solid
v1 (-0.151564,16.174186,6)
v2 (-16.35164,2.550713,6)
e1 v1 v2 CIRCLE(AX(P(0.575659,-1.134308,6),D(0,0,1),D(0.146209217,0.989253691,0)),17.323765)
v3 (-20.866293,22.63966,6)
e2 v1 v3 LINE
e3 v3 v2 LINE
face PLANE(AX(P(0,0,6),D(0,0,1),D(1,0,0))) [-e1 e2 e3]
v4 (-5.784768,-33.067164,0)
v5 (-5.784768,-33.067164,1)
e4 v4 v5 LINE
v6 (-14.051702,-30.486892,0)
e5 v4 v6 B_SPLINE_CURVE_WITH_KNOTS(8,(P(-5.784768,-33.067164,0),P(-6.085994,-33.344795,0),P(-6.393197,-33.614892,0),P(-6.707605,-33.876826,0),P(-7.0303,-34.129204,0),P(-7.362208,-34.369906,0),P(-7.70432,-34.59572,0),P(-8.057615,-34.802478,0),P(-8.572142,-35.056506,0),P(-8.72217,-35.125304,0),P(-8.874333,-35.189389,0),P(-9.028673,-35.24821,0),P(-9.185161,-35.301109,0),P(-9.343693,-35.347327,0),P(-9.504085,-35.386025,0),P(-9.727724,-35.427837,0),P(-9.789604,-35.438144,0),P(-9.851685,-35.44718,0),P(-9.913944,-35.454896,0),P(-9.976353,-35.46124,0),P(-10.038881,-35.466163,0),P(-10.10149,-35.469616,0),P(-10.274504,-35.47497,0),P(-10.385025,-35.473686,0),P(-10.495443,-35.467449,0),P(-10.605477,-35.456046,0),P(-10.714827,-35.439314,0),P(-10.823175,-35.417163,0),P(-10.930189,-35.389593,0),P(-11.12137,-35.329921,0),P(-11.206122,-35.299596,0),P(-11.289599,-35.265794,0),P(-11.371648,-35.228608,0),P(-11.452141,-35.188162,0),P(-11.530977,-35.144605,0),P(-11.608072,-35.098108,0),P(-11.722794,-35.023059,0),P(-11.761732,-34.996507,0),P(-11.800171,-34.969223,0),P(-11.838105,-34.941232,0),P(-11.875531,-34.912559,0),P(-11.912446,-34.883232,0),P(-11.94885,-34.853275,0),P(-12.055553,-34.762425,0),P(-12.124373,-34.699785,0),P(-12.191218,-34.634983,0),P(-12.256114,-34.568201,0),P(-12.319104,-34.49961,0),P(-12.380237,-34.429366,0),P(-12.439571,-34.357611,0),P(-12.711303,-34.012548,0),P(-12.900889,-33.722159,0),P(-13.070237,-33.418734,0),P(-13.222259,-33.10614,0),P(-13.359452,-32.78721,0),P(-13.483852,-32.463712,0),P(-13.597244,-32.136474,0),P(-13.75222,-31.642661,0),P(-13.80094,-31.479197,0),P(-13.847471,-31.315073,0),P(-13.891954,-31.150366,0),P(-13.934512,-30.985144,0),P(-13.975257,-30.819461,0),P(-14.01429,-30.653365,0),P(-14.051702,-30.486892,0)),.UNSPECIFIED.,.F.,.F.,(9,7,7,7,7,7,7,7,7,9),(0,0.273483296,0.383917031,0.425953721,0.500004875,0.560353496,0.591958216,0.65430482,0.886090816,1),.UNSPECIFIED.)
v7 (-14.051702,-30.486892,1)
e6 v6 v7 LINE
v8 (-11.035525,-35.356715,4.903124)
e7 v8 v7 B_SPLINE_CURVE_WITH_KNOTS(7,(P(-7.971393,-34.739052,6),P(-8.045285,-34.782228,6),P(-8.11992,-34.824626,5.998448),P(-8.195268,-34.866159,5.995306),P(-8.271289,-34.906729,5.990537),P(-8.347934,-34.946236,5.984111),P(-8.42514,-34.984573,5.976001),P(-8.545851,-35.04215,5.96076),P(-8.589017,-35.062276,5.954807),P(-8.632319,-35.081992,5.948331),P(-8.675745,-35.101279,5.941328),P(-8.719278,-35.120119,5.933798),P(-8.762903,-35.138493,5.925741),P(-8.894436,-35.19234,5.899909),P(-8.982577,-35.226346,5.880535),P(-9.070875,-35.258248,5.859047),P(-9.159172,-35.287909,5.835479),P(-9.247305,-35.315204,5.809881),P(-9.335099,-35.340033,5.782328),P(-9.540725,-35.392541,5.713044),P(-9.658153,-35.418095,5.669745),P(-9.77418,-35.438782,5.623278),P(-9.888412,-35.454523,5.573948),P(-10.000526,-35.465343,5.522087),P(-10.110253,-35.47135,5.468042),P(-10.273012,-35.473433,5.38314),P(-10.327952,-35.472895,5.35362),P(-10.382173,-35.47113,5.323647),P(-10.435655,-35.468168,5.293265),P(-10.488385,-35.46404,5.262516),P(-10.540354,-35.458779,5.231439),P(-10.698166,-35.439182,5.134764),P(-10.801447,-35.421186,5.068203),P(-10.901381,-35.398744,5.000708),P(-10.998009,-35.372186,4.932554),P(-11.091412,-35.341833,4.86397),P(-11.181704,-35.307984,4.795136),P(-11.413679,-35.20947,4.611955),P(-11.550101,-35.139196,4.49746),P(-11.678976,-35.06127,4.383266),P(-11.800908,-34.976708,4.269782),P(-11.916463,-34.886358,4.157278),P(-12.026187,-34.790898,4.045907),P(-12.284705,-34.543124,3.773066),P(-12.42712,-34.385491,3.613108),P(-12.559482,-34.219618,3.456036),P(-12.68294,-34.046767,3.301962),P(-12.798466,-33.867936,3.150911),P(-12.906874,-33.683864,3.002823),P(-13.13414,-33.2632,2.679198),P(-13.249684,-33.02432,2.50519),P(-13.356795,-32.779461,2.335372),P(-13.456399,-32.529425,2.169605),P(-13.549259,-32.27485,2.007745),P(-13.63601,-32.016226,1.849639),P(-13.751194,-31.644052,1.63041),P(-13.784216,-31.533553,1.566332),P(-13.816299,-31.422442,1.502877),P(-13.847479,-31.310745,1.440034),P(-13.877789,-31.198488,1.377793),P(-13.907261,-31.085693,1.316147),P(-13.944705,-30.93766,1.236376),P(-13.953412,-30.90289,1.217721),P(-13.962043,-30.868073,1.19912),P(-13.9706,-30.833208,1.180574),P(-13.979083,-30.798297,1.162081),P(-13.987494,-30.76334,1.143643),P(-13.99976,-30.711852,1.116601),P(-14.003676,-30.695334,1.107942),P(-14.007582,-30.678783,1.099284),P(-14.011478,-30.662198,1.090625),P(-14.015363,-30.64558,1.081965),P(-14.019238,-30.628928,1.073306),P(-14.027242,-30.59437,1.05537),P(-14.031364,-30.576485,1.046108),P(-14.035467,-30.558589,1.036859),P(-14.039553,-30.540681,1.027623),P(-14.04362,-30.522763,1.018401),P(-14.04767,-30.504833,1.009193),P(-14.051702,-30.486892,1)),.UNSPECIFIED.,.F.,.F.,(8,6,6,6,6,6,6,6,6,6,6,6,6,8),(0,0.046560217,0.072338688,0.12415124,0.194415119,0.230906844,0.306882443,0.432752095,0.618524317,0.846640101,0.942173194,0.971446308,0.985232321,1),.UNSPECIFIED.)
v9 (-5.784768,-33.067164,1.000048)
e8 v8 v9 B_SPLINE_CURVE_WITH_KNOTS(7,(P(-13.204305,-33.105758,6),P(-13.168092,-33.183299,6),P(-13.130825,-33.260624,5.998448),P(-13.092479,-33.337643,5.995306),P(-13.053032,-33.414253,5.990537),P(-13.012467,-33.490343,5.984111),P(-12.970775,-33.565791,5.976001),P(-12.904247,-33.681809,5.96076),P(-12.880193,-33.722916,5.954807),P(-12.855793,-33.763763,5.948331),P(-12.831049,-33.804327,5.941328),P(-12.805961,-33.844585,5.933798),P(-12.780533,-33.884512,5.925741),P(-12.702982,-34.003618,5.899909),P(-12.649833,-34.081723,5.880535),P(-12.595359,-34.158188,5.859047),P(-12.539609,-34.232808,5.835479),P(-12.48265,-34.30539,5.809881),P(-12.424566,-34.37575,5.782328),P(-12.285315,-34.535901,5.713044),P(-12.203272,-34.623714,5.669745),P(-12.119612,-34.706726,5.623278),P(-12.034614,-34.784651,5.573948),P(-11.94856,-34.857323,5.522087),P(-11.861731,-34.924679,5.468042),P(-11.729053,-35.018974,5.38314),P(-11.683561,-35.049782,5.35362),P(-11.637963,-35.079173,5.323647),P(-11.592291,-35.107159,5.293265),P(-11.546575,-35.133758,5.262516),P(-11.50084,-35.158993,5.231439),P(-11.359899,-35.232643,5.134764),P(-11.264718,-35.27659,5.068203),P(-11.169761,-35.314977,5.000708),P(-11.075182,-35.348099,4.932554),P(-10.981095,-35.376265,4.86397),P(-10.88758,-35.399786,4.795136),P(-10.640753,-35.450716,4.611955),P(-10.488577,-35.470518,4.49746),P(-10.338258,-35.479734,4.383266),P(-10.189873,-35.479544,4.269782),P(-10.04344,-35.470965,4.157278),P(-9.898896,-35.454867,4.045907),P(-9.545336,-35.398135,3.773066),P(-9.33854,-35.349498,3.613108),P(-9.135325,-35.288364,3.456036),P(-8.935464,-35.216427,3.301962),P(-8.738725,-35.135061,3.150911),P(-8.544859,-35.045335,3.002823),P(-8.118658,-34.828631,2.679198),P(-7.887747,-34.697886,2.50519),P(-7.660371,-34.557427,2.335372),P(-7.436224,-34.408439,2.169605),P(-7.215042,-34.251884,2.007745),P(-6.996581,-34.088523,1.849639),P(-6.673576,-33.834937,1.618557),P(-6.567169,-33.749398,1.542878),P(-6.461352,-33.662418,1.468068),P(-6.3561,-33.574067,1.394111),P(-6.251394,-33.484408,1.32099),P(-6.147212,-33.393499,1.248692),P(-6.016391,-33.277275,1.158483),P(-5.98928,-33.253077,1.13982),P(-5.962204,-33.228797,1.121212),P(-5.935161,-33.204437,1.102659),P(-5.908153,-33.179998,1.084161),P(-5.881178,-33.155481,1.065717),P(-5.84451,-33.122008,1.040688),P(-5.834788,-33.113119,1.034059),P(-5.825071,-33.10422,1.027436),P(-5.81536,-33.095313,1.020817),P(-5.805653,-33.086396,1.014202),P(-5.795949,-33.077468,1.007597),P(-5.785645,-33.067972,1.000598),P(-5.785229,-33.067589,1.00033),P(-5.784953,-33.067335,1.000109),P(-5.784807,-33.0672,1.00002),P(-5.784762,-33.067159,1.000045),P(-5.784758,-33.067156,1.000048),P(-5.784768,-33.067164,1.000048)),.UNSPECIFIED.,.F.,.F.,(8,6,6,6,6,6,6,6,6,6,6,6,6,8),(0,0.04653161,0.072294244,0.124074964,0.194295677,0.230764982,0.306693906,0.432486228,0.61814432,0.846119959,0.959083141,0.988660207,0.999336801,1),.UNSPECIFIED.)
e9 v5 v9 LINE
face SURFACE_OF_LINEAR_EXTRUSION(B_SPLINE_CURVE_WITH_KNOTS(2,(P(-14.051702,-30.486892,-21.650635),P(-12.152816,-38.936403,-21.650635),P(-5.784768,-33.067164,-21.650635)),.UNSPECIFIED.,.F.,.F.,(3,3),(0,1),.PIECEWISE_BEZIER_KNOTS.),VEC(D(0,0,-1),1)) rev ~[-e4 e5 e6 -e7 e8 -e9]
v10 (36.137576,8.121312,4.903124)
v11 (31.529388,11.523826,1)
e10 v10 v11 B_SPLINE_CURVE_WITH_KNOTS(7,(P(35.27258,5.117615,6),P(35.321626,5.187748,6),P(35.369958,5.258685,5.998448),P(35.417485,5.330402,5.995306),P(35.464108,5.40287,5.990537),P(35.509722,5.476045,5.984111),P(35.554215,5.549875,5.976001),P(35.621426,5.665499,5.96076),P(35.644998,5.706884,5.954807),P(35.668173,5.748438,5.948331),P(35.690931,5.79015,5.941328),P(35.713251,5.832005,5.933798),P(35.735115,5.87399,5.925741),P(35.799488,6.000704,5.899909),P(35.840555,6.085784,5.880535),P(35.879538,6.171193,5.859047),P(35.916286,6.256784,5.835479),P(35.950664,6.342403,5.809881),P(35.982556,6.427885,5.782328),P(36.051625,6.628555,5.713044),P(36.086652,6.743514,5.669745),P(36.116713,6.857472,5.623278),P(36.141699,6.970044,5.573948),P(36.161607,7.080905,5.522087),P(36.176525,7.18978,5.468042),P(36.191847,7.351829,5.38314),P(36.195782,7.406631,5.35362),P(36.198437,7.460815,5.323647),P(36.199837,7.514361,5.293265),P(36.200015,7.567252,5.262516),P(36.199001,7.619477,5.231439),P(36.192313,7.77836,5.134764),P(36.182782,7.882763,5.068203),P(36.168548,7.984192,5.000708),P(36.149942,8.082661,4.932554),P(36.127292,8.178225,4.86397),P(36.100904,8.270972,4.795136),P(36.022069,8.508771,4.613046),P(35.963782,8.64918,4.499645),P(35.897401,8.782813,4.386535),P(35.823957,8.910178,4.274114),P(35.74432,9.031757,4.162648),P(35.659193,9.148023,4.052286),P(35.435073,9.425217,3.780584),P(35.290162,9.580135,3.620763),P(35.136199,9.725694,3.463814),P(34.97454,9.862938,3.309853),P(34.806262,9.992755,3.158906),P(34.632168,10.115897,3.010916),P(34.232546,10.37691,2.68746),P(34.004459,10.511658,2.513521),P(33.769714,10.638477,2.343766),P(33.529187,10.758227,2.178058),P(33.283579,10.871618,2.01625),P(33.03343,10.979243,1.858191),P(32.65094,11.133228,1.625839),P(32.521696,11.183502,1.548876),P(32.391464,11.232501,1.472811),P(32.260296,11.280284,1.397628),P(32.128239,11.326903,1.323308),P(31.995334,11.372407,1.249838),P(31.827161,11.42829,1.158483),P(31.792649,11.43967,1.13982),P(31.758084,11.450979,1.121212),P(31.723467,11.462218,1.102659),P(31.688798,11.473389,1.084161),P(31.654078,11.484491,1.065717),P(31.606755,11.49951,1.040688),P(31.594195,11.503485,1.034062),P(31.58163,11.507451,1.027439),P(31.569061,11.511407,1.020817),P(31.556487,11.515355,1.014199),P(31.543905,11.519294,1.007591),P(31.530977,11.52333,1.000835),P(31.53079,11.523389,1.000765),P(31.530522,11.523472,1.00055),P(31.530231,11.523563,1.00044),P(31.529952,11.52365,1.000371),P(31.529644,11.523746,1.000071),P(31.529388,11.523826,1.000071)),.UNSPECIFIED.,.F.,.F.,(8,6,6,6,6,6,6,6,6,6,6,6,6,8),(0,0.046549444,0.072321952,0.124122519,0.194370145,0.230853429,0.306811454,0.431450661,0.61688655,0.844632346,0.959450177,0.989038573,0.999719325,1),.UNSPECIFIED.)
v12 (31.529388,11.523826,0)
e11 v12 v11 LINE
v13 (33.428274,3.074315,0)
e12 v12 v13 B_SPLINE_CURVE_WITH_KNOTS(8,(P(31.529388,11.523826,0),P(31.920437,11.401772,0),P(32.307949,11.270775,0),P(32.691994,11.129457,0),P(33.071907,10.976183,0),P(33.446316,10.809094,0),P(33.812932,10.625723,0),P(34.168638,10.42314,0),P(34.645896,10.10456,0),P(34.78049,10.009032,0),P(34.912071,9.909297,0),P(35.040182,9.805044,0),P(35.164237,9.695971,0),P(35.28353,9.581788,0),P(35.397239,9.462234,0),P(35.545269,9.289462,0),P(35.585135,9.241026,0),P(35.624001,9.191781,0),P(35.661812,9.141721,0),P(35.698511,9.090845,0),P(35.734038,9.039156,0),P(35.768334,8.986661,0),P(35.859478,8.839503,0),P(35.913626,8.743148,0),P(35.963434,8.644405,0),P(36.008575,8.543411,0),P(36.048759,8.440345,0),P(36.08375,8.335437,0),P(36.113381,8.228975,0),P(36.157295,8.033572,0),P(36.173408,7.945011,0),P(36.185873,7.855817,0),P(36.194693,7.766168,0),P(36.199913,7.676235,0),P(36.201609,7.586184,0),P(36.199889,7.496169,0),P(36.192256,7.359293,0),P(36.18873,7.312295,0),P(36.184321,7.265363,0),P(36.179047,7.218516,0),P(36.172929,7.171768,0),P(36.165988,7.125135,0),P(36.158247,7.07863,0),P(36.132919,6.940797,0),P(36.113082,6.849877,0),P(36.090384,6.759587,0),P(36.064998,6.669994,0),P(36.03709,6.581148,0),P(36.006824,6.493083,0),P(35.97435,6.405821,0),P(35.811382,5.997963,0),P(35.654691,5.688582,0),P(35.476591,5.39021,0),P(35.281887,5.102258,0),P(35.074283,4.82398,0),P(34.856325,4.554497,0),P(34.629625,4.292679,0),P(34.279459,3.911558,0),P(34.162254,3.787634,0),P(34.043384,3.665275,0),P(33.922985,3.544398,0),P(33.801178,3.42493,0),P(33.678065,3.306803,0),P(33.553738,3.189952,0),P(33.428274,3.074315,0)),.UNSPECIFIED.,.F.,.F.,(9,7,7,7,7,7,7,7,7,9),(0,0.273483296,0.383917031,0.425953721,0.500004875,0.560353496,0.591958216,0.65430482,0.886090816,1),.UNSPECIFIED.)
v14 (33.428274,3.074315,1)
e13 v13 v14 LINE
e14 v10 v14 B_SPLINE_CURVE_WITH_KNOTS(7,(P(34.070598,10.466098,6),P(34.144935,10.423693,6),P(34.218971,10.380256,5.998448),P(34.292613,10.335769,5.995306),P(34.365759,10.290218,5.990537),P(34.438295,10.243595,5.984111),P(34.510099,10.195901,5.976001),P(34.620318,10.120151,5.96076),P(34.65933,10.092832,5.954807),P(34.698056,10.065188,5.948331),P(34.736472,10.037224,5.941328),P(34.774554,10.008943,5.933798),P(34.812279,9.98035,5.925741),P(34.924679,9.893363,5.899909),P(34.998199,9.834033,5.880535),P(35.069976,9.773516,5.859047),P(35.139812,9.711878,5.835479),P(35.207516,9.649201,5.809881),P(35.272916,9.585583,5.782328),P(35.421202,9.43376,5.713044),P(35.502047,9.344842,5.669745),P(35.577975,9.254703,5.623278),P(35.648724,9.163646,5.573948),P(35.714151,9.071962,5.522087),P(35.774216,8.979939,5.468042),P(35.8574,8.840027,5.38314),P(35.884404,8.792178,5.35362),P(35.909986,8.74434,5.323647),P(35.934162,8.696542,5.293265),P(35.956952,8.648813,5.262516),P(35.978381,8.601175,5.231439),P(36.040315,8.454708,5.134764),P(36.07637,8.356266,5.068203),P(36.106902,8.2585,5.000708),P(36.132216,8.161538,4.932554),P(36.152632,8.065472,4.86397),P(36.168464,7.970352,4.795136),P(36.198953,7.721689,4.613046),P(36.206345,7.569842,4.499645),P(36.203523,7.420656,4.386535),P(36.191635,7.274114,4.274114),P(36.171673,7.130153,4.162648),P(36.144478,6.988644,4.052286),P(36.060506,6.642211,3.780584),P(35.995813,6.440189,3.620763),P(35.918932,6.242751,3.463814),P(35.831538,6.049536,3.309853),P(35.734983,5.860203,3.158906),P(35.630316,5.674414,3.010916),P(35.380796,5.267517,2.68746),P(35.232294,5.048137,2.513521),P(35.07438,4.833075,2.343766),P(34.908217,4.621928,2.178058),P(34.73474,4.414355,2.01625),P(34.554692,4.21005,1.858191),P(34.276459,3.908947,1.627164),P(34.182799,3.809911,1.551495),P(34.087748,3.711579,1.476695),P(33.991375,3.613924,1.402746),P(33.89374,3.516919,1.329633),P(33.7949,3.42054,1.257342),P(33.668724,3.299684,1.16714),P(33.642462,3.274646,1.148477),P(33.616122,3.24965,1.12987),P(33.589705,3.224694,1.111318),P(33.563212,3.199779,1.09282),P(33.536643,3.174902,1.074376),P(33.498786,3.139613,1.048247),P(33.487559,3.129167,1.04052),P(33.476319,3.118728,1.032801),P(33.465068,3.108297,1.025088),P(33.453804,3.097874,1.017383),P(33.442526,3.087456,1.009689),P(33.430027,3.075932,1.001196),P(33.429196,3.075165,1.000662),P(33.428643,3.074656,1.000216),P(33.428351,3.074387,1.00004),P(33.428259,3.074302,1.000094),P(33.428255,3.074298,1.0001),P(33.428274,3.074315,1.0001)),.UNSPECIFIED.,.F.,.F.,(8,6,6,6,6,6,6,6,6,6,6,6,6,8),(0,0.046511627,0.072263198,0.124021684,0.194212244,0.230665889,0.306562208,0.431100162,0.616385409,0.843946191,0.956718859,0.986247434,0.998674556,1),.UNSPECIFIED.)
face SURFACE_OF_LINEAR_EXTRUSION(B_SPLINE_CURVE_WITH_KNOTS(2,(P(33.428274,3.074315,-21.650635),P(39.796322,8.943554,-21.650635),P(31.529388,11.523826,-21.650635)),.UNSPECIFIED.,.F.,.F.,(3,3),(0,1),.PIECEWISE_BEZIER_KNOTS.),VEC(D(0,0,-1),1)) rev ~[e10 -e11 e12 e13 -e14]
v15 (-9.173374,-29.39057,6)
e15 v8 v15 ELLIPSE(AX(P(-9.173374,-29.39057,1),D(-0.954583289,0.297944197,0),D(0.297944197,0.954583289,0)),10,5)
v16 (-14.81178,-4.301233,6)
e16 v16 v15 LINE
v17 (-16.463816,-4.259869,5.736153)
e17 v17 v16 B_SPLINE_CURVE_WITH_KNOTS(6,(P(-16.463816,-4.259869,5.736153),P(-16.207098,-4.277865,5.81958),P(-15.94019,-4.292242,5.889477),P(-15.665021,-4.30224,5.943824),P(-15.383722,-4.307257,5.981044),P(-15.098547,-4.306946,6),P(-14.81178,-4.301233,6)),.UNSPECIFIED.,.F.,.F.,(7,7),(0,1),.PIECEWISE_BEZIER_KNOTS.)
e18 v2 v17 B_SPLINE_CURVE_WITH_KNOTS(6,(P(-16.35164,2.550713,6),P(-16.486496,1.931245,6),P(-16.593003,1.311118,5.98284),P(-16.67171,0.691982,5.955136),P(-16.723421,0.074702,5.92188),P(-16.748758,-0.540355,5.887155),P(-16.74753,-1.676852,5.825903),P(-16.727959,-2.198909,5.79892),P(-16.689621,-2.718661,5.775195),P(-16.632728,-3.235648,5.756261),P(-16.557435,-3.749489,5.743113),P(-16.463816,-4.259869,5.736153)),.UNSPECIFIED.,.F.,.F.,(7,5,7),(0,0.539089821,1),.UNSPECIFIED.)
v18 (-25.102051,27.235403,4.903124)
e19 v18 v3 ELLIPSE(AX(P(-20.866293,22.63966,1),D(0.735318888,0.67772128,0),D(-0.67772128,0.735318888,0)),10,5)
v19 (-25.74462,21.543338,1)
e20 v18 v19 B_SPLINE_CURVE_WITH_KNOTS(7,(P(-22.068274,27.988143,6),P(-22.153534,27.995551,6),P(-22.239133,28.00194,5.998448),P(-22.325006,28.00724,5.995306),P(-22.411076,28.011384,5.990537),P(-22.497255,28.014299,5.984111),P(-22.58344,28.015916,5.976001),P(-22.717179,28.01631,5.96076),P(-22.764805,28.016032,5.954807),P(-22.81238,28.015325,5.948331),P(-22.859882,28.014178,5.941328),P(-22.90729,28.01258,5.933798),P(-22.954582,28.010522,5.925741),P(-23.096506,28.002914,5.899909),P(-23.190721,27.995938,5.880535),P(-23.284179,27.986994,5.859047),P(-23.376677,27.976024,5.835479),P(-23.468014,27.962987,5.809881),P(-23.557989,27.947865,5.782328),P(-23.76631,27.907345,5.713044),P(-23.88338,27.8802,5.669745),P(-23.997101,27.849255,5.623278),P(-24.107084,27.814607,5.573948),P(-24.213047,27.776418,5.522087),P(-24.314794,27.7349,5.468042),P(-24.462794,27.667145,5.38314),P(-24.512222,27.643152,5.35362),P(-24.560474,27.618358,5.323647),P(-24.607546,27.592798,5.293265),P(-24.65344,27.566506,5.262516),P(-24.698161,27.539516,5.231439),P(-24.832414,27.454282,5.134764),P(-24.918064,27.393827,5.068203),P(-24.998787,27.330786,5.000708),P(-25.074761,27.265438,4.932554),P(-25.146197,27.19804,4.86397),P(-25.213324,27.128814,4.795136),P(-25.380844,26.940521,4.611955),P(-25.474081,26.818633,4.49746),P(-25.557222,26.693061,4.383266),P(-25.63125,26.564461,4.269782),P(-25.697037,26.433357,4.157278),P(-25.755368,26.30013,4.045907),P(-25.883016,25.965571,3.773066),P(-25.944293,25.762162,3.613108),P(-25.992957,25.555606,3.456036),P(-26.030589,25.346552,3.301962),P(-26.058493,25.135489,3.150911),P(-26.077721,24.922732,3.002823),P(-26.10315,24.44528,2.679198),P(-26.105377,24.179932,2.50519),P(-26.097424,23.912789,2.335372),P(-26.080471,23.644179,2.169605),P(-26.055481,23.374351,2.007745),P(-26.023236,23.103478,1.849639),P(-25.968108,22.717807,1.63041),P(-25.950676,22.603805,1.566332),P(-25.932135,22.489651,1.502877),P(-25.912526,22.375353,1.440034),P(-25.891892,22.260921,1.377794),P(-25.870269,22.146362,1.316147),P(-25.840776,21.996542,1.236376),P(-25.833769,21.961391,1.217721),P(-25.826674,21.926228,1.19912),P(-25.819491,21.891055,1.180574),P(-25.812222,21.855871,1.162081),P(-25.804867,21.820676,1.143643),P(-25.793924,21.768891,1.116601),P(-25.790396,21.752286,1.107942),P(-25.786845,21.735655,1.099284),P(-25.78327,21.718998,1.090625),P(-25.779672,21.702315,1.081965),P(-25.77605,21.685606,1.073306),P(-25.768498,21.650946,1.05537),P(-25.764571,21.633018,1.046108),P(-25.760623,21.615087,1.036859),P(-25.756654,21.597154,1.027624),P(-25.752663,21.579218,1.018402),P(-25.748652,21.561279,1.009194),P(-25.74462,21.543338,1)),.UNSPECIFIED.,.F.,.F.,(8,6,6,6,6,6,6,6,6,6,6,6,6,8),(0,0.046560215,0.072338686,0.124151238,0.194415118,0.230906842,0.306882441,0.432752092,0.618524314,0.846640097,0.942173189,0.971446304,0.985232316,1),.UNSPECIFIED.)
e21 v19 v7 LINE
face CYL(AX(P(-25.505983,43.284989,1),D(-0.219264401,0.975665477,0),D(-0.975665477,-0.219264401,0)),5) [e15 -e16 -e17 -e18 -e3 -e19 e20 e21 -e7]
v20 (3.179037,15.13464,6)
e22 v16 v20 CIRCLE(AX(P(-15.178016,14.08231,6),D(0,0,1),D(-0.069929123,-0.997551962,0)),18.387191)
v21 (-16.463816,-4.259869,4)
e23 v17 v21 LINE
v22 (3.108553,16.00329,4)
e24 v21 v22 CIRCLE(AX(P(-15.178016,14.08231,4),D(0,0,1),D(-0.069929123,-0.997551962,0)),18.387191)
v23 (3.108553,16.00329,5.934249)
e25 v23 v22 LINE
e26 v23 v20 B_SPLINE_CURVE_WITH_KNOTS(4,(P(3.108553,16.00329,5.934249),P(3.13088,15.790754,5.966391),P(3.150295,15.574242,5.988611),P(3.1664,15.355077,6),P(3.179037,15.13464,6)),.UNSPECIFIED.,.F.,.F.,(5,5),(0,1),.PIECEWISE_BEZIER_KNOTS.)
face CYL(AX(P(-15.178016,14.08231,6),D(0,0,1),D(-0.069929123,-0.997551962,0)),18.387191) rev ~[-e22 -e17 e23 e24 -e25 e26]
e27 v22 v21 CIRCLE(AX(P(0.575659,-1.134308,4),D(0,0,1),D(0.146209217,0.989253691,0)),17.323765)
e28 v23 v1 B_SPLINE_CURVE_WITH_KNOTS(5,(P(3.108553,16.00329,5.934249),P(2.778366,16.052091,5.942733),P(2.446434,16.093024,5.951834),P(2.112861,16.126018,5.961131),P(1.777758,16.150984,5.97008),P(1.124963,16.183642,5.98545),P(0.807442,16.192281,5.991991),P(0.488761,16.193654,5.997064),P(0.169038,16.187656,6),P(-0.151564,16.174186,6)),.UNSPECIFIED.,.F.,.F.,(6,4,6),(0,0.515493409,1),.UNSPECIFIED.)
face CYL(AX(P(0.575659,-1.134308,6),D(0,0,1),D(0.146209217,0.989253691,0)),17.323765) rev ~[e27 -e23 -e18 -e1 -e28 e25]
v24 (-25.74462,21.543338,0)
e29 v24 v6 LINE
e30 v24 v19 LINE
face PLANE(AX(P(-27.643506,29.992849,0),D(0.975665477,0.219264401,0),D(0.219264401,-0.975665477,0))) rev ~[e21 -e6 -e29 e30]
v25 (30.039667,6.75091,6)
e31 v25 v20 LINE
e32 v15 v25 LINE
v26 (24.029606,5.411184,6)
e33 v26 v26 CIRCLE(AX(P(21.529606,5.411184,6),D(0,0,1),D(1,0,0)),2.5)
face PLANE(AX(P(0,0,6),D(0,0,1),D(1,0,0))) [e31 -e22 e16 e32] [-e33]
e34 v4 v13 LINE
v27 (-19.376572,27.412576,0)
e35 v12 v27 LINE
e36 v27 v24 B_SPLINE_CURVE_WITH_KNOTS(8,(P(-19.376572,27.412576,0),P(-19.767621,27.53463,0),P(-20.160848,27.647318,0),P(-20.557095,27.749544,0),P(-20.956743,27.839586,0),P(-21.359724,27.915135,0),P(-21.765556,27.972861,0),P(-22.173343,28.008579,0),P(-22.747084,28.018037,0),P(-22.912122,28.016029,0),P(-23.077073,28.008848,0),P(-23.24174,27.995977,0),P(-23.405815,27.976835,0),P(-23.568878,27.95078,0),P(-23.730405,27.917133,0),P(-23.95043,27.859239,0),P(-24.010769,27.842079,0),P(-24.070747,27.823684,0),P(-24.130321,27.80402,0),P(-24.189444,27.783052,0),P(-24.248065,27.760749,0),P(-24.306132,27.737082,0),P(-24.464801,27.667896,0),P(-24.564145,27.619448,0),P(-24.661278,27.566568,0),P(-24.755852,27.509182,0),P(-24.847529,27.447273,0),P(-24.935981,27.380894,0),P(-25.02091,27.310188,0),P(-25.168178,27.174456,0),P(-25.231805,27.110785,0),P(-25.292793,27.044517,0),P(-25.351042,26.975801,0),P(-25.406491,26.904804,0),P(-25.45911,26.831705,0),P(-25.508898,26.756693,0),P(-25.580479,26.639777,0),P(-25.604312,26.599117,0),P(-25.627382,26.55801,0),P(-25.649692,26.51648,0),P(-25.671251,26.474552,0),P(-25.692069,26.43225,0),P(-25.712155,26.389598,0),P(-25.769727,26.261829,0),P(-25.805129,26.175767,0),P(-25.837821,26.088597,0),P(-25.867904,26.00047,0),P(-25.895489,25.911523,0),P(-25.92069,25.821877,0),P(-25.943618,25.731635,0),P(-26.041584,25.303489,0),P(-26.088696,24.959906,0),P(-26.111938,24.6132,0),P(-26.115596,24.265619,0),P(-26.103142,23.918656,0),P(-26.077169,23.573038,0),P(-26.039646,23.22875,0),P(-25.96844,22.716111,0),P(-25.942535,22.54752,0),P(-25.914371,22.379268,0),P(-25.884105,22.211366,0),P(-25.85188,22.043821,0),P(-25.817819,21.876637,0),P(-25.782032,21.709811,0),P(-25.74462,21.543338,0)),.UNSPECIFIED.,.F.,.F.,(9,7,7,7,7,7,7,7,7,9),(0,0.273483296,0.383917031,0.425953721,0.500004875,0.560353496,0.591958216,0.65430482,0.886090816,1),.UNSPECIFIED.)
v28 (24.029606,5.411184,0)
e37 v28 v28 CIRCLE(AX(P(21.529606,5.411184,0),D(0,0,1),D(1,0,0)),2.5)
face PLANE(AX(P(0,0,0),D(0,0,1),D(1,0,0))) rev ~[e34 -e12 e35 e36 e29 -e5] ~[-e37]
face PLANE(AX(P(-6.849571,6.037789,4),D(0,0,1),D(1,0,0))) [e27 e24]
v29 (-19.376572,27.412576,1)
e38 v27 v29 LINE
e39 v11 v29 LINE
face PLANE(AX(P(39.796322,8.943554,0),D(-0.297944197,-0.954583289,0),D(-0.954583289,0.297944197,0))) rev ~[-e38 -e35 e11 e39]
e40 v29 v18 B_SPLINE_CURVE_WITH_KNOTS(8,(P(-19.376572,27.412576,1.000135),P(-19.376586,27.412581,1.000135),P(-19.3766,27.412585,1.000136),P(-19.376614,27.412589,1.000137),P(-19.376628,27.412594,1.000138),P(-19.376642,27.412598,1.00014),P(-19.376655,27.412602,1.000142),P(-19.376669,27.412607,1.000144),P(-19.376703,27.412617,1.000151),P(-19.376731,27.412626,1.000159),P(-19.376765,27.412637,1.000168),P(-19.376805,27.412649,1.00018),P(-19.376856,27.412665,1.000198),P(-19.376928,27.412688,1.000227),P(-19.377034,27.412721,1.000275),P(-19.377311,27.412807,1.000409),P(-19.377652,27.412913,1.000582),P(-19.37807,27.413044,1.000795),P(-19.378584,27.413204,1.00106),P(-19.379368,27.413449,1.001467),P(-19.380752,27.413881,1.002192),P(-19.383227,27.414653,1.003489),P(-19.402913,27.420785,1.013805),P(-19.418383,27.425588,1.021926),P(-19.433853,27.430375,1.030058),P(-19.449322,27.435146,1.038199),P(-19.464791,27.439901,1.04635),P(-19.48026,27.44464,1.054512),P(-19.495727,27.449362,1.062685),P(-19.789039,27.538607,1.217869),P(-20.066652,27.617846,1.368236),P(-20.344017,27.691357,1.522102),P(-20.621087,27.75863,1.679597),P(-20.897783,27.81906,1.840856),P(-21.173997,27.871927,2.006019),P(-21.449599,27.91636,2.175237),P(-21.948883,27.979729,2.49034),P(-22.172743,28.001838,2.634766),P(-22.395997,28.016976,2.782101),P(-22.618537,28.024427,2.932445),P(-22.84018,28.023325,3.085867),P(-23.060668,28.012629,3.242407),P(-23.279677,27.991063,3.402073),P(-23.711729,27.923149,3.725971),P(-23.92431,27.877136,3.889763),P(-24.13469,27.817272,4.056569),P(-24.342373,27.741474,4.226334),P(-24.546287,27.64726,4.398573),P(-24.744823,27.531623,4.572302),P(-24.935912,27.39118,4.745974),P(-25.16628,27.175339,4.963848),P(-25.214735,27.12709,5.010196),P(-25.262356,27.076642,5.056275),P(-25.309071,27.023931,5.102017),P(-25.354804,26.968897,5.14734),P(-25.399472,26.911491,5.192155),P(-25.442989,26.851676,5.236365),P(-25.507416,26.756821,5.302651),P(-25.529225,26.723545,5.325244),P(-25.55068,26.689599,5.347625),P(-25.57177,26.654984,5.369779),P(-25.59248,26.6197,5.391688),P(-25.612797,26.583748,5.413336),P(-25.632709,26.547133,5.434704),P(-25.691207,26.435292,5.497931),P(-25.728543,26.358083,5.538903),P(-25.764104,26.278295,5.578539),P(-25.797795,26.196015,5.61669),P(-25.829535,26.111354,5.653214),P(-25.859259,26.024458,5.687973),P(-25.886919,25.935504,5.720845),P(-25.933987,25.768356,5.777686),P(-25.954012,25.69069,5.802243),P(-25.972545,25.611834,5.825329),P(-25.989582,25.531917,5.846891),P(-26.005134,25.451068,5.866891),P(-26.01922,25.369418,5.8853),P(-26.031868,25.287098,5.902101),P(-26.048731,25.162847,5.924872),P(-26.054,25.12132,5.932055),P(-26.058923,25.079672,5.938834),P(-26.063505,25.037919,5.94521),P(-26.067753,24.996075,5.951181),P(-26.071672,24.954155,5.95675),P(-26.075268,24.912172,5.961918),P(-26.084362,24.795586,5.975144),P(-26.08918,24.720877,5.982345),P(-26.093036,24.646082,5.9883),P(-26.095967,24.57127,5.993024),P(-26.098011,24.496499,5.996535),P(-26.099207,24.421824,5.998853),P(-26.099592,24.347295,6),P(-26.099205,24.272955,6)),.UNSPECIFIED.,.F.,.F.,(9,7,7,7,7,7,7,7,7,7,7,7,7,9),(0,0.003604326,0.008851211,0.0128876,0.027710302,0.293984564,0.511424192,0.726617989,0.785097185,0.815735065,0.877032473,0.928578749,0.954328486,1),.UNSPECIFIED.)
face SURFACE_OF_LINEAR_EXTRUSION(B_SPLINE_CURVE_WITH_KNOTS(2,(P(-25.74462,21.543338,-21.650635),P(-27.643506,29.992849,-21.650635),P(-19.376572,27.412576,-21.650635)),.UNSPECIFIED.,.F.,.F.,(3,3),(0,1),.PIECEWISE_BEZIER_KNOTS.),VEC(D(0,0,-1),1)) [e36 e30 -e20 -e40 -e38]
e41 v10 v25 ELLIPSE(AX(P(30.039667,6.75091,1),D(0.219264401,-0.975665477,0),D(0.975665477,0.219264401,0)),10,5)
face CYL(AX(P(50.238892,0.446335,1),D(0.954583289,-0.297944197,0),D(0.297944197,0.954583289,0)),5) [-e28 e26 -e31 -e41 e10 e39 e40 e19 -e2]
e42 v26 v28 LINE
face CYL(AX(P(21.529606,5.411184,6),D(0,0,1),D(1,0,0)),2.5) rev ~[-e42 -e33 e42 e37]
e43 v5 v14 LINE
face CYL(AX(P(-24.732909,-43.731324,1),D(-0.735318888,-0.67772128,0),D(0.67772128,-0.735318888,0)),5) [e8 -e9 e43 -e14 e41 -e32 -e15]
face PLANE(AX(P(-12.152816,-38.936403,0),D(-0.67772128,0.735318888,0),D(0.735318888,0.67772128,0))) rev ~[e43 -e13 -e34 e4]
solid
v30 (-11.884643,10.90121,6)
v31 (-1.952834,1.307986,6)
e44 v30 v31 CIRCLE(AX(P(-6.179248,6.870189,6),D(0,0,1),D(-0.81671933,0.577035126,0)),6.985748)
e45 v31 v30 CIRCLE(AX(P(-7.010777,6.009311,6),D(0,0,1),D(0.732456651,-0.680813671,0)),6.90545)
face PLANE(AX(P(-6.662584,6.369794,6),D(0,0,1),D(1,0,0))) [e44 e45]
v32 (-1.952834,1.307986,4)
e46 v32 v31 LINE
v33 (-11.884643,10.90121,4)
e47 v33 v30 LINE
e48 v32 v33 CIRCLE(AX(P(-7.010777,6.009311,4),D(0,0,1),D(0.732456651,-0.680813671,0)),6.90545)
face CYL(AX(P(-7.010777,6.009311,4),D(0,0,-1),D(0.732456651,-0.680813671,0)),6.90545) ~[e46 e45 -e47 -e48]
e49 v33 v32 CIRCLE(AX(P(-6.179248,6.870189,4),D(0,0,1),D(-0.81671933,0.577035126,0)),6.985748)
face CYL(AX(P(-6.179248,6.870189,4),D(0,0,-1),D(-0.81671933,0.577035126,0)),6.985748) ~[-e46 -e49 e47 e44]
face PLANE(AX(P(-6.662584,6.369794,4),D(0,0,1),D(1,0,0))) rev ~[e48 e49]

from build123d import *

# Parameters (mm, degrees)
F1_DEPTH    = 6
F3_DEPTH    = 2
F5_DEPTH    = 2
F6_T1_DEPTH = 95.6484477973
F6_T3_DEPTH = 95.6484477973
F6_T5_DEPTH = 95.6484477973
F7_T1_DEPTH = 44.3012701892
F8_R        = 2.5
F9_DEPTH    = 32.8


# Not quite as in the source:
# - a fillet or chamfer that OpenCascade refuses, or shapes differently, is made with other operations: its cross-section is extruded or revolved along the edge and cut away or added
# - a feature of the source that left no trace in its solid (it failed there, or was rolled back) is left out


with BuildPart() as f1:
    # F0 (on Top) → F1 (new body)
    with BuildSketch(Plane.XY):
        Polygon((-12.152816169, -38.9364026487), (39.7963219102, 8.9435537945), (-27.6435057413, 29.9928488542), align=None)
    extrude(amount=F1_DEPTH)

    # F2 (on face) → F3 (cut)
    with BuildSketch(Plane.XY.offset(6)):
        with BuildLine():
            ThreePointArc((-16.4638161659, -4.259868525), (-1.9528341067, 1.3079860402), (3.1085531227, 16.0032901913))
            ThreePointArc((3.1085531227, 16.0032901913), (-11.8846429173, 10.9012104958), (-16.4638161659, -4.259868525))
        make_face()
    extrude(amount=-F3_DEPTH, mode=Mode.SUBTRACT)

    # F6: fillet of radius 5 on 3 edges, made by hand

    # F6_s2 → F6_t1 (cut)
    with BuildSketch(Plane(origin=(-10.4861497959, 46.660444211, 0), x_dir=(0, 0, 1), z_dir=(0.2192644008, -0.9756654768, 0))):
        with BuildLine():
            ThreePointArc((1, 20.3944501768), (4.5355339059, 18.9299840827), (6, 15.3944501768))
            Line((6, 15.3944501768), (6, 20.3944501768))
            Line((6, 20.3944501768), (1, 20.3944501768))
        make_face()
    extrude(amount=F6_T1_DEPTH, mode=Mode.SUBTRACT)

    # F6_s4 → F6_t3 (cut)
    with BuildSketch(Plane(origin=(45.6522049365, -14.2489499944, 0), x_dir=(0, 0, 1), z_dir=(-0.9545832889, 0.2979441972, 0))):
        with BuildLine():
            ThreePointArc((1, 20.3944501768), (4.5355339059, 18.9299840827), (6, 15.3944501768))
            Line((6, 15.3944501768), (6, 20.3944501768))
            Line((6, 20.3944501768), (1, 20.3944501768))
        make_face()
    extrude(amount=F6_T3_DEPTH, mode=Mode.SUBTRACT)

    # F6_s6 → F6_t5 (cut)
    with BuildSketch(Plane(origin=(-35.1660551406, -32.4114942166, 0), x_dir=(0, 0, 1), z_dir=(0.7353188881, 0.6777212796, 0))):
        with BuildLine():
            ThreePointArc((1, 20.3944501768), (4.5355339059, 18.9299840827), (6, 15.3944501768))
            Line((6, 15.3944501768), (6, 20.3944501768))
            Line((6, 20.3944501768), (1, 20.3944501768))
        make_face()
    extrude(amount=F6_T5_DEPTH, mode=Mode.SUBTRACT)

    # F7: fillet of radius 5 on 3 edges, made by hand

    # F7_s2 → F7_t1 (cut)
    with BuildSketch(Plane.XY.offset(-21.6506350946)):
        with BuildLine():
            add(Edge.make_bspline(
                [(-25.7446203291, 21.5433379695), (-27.6435057413, 29.9928488542), (-19.3765719594, 27.4125764177)],
                knots=[0, 0, 0, 1, 1, 1], degree=2, weights=[1, 1, 1]))
            Line((-19.3765719594, 27.4125764177), (-27.6435057413, 29.9928488542))
            Line((-27.6435057413, 29.9928488542), (-25.7446203291, 21.5433379695))
        make_face()
        with BuildLine():
            add(Edge.make_bspline(
                [(-14.0517015812, -30.4868917639), (-12.152816169, -38.9364026487), (-5.7847677993, -33.0671642005)],
                knots=[0, 0, 0, 1, 1, 1], degree=2, weights=[1, 1, 1]))
            Line((-5.7847677993, -33.0671642005), (-12.152816169, -38.9364026487))
            Line((-12.152816169, -38.9364026487), (-14.0517015812, -30.4868917639))
        make_face()
        with BuildLine():
            add(Edge.make_bspline(
                [(33.4282735406, 3.0743153463), (39.7963219102, 8.9435537945), (31.5293881284, 11.523826231)],
                knots=[0, 0, 0, 1, 1, 1], degree=2, weights=[1, 1, 1]))
            Line((31.5293881284, 11.523826231), (39.7963219102, 8.9435537945))
            Line((39.7963219102, 8.9435537945), (33.4282735406, 3.0743153463))
        make_face()
    extrude(amount=F7_T1_DEPTH, mode=Mode.SUBTRACT)

    # F8 (on face) → F9 (cut)
    with BuildSketch(Plane.XY.offset(6)):
        with Locations((21.5296056122, 5.4111843929)):
            Circle(F8_R)
    extrude(amount=-F9_DEPTH, mode=Mode.SUBTRACT)


with BuildPart() as f5:
    # F4 (on face) → F5 (new body)
    with BuildSketch(Plane.XY.offset(4)):
        with BuildLine():
            ThreePointArc((-11.8846429173, 10.9012104958), (-11.0325286439, 1.8456155594), (-1.9528341067, 1.3079860402))
            ThreePointArc((-1.9528341067, 1.3079860402), (-2.2132820516, 10.9761296439), (-11.8846429173, 10.9012104958))
        make_face()
    extrude(amount=F5_DEPTH)


solid = Compound([f1.part, f5.part])
